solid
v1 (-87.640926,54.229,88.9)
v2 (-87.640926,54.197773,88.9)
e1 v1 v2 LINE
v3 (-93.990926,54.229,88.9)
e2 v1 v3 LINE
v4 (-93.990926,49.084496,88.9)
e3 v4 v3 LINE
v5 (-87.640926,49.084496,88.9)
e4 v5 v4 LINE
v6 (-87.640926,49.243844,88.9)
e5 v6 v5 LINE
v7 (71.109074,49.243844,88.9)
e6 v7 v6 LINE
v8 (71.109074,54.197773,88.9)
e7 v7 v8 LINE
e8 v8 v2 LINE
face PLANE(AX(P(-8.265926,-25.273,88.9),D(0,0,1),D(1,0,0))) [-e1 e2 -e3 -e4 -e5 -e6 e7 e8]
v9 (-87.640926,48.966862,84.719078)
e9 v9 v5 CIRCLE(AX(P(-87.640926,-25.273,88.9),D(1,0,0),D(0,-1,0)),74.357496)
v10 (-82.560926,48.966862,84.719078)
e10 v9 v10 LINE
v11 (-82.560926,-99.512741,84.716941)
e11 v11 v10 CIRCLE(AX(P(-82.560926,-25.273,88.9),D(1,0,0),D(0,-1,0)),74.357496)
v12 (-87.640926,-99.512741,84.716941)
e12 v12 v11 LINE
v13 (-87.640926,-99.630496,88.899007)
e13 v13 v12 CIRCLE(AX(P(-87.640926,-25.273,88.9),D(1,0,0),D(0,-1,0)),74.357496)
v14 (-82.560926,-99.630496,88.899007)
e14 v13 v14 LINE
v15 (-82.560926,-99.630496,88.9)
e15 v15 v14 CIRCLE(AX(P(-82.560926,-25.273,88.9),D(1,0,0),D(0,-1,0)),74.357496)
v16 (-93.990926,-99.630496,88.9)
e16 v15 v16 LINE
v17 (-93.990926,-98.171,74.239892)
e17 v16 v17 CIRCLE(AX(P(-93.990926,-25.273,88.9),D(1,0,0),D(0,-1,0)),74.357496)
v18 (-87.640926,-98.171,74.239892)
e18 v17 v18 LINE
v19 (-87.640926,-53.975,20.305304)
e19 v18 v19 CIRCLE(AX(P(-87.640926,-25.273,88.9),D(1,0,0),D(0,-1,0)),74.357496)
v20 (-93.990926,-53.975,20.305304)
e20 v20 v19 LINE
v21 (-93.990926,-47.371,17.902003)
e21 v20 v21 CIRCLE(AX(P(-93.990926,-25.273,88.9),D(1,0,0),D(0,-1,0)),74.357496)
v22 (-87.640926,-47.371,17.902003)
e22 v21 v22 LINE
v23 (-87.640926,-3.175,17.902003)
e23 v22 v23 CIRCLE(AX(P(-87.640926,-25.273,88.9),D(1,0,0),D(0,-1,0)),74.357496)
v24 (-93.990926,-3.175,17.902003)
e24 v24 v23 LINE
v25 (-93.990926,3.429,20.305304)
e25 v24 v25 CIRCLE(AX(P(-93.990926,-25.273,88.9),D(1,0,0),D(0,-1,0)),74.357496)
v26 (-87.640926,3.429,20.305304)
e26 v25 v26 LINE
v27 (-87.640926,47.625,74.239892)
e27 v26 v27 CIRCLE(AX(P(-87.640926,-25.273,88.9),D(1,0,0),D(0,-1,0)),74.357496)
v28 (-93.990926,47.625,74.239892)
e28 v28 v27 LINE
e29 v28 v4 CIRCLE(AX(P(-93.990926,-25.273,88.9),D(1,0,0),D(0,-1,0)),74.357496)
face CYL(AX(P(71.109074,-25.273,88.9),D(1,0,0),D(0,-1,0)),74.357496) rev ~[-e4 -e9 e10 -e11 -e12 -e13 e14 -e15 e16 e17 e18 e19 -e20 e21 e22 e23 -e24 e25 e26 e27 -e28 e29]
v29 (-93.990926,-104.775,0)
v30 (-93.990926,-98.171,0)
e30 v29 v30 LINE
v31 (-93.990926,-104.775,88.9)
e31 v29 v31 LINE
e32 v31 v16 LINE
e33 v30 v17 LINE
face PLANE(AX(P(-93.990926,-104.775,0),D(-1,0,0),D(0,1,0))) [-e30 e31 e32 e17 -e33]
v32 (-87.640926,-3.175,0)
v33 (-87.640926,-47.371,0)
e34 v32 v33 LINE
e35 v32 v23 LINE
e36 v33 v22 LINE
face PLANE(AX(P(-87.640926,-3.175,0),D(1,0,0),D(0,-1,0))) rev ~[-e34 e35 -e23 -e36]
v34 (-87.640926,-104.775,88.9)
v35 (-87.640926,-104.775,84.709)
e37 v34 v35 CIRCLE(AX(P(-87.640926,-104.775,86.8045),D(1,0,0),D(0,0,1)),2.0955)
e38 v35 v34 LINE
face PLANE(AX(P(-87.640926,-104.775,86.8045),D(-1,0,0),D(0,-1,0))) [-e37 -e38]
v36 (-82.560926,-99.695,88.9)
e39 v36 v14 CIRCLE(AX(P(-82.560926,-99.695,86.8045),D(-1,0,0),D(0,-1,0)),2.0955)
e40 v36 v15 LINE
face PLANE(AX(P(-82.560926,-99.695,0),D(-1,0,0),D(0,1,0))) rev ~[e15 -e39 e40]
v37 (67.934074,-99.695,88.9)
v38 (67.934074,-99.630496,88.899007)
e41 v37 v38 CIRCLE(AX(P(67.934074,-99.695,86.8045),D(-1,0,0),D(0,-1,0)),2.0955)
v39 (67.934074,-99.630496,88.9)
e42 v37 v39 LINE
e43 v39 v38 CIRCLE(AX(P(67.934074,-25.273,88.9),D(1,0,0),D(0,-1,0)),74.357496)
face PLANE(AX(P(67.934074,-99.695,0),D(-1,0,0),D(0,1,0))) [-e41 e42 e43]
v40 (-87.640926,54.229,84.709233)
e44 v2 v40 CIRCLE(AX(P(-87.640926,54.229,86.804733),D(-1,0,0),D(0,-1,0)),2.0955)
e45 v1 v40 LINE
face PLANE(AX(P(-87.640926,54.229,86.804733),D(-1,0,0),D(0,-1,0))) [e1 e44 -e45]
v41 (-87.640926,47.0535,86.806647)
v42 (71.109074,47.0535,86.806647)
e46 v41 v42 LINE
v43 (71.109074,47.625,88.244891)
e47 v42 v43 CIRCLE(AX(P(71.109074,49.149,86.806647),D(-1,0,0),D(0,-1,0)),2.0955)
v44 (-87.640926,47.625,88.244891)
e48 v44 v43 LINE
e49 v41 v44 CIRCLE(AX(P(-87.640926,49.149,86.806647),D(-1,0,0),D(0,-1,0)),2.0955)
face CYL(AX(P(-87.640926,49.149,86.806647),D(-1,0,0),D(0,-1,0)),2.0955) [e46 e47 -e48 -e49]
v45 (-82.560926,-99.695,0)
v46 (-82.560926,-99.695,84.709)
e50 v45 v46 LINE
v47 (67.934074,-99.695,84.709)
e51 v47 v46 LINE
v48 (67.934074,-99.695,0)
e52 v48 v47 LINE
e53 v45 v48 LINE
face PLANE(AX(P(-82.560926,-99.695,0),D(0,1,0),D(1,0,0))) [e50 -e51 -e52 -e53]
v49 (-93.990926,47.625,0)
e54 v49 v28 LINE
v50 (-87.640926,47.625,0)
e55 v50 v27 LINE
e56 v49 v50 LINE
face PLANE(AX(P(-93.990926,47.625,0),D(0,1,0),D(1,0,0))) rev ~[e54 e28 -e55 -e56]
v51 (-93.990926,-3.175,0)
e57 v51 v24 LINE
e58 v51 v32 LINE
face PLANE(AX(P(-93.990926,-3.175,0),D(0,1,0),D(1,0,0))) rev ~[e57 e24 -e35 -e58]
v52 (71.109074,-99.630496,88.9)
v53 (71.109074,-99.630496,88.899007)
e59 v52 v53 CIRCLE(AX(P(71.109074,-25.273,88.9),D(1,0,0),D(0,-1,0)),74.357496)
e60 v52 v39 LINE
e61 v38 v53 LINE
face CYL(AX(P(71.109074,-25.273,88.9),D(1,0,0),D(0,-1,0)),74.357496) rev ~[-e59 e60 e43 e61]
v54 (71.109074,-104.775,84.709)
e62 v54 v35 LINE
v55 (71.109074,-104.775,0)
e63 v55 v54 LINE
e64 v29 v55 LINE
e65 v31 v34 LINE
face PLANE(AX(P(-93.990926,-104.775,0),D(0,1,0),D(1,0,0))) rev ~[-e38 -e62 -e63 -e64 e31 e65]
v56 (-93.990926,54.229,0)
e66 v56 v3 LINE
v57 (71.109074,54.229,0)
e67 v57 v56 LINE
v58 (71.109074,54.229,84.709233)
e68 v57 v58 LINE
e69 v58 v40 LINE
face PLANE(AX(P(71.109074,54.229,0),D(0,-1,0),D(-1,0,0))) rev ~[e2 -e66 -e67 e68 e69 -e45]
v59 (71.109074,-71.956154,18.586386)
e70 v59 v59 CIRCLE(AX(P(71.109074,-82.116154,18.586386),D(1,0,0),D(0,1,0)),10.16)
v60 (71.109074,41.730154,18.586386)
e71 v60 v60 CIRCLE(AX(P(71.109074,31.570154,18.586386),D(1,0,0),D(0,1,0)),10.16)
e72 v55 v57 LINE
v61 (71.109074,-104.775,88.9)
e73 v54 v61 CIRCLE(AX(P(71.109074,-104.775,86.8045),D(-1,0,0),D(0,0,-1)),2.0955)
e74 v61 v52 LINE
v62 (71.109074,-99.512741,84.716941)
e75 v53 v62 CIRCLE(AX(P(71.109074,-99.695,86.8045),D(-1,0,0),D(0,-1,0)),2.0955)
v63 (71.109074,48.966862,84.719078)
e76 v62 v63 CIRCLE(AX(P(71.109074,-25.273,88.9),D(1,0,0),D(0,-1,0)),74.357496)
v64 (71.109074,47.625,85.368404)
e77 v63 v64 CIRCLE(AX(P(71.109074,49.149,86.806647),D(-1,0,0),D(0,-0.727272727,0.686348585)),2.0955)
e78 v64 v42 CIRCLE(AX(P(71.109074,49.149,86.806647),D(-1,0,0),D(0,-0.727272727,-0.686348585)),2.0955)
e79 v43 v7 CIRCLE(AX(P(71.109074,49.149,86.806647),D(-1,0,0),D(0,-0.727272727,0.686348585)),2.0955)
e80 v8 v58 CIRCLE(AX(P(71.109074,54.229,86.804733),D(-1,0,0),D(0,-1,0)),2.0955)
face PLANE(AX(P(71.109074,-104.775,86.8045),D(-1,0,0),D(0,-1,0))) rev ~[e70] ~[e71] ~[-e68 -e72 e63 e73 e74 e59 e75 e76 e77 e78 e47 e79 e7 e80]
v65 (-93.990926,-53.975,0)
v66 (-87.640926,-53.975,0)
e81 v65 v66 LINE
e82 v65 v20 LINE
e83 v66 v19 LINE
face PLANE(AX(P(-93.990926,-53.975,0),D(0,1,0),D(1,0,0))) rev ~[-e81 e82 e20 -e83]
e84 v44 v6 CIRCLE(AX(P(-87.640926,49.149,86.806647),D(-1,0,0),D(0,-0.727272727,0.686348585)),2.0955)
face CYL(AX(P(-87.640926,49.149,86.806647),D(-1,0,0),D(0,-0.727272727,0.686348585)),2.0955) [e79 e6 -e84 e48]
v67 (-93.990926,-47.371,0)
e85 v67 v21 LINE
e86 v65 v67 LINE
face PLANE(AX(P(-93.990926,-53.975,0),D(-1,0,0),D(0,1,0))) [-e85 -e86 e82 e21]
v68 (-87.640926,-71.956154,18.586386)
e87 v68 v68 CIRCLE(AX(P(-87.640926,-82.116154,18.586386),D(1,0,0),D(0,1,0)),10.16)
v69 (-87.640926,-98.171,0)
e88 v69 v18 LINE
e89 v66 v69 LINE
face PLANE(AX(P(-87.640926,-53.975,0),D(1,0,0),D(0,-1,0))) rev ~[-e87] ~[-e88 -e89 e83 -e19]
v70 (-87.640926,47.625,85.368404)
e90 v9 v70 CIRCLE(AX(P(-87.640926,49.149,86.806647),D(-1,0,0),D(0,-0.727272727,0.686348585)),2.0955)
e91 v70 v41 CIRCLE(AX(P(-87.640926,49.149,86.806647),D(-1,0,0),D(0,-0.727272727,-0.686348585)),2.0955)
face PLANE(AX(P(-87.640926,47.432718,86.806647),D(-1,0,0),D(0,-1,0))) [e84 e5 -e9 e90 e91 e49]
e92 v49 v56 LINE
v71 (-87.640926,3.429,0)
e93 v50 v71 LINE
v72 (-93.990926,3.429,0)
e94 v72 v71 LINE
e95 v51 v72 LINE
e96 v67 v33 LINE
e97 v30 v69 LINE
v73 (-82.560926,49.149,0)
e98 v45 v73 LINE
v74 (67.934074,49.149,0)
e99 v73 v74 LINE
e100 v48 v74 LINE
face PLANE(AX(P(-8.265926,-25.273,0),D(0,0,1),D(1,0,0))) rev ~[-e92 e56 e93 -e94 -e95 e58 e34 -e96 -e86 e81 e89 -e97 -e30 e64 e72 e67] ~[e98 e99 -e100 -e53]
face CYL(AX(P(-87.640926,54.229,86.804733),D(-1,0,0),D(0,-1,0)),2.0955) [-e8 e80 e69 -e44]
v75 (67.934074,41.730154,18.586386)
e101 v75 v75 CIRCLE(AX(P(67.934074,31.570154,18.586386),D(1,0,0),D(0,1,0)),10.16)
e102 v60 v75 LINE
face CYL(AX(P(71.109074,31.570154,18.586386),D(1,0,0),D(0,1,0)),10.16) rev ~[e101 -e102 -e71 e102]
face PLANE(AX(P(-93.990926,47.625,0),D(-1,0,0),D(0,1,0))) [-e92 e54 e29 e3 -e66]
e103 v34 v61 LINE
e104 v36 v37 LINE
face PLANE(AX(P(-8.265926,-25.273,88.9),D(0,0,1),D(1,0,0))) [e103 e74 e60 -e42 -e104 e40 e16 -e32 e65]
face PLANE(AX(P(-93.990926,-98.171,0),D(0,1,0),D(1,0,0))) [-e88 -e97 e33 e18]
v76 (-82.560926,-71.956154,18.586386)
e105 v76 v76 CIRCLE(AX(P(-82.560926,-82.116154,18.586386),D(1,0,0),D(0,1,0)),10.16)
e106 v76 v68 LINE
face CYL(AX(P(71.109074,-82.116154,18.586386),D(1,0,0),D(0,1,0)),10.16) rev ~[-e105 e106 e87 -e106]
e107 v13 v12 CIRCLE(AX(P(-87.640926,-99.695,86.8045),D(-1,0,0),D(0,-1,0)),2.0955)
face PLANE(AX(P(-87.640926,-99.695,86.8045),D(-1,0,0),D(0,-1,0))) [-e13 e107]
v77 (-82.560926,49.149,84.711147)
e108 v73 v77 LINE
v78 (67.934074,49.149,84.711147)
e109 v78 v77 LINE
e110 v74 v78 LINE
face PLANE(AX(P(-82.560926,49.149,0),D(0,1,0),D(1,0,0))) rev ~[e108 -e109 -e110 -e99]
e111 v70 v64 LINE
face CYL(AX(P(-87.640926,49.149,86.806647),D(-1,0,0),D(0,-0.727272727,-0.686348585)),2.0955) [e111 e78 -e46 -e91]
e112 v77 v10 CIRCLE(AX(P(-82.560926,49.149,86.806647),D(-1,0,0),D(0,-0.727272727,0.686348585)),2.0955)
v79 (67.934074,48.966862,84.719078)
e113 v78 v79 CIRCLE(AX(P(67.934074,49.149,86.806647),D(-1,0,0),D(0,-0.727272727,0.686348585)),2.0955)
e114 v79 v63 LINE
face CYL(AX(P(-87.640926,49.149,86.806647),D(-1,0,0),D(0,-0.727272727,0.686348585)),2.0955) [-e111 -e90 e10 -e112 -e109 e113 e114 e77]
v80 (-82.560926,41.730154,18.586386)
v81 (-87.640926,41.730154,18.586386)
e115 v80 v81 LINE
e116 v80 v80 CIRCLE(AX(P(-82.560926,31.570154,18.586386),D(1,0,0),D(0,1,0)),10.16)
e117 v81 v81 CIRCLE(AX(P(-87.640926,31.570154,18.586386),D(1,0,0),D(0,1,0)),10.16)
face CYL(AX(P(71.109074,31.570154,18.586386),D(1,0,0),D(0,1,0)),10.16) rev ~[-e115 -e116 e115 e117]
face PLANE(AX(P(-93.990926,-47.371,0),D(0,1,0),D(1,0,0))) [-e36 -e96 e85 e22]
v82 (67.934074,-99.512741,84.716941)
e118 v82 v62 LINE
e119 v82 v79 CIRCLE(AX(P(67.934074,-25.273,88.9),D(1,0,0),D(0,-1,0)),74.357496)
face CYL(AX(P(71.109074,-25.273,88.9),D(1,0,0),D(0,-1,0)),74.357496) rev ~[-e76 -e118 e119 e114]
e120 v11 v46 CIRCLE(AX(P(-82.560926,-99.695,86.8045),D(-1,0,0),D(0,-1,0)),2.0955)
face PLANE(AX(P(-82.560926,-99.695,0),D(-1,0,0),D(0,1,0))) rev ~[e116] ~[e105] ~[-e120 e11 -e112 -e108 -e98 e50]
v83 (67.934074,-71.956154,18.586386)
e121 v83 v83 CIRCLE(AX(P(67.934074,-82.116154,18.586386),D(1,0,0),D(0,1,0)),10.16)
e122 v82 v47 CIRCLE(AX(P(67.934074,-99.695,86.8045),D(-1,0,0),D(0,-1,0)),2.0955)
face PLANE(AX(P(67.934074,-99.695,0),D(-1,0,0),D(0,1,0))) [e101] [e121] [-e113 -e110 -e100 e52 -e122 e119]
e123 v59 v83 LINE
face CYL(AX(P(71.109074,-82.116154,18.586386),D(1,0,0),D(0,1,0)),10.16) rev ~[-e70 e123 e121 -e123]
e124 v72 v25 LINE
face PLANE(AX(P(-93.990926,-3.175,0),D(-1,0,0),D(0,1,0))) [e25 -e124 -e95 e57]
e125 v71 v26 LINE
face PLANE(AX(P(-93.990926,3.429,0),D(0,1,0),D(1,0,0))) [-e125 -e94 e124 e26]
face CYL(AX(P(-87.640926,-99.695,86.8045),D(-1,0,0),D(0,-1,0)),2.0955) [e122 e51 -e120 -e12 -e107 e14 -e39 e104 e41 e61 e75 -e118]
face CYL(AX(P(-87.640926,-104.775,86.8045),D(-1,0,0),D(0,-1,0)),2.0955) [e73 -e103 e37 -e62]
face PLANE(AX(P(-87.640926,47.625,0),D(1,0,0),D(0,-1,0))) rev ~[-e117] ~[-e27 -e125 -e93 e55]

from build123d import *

# Parameters (mm, degrees)
F0_W     = 150.495
F0_H     = 148.844
F0_W_2   = 6.35
F0_H_2   = 6.604
F1_DEPTH = 88.9
F3_R     = 10.16
F4_DEPTH = 187.706
F2_R     = 2.0955
F5_DEPTH = 158.75


with BuildPart() as f1:
    # F0 (on Top) → F1 (new body)
    with BuildSketch(Plane.XY):
        Polygon((71.1090738666, 54.229), (-87.6409261334, 54.229), (-87.6409261334, 47.625), (-87.6409261334, 3.429), (-87.6409261334, -3.175), (-87.6409261334, -47.371), (-87.6409261334, -53.975), (-87.6409261334, -98.171), (-87.6409261334, -104.775), (71.1090738666, -104.775), align=None)
        with Locations((-7.3134261334, -25.273)):
            Rectangle(F0_W, F0_H, mode=Mode.SUBTRACT)
        with Locations((-90.8159261334, 50.927)):
            Rectangle(F0_W_2, F0_H_2)
        with Locations((-90.8159261334, 0.127)):
            Rectangle(F0_W_2, F0_H_2)
        with Locations((-90.8159261334, -50.673)):
            Rectangle(F0_W_2, F0_H_2)
        with Locations((-90.8159261334, -101.473)):
            Rectangle(F0_W_2, F0_H_2)
    extrude(amount=F1_DEPTH)

    # F3 (on face) → F4 (cut)
    with BuildSketch(Plane.YZ.offset(71.1090738666)):
        with BuildLine():
            ThreePointArc((-99.6304956393, 88.9), (-25.273, 14.5425043607), (49.0844956393, 88.9))
            Line((49.0844956393, 88.9), (-99.6304956393, 88.9))
        make_face()
        with Locations((-82.1161537051, 18.5863859951)):
            Circle(F3_R)
        with Locations((31.5701537051, 18.5863859951)):
            Circle(F3_R)
    extrude(amount=-F4_DEPTH, mode=Mode.SUBTRACT)

    # F2 (on face) → F5 (join, through all)
    with BuildSketch(Plane(origin=(-87.6409261334, 0, 0), x_dir=(0, -1, 0), z_dir=(-1, 0, 0))):
        with Locations((104.775, 86.8045)):
            Circle(F2_R)
        with Locations((-54.229, 86.8047326803)):
            Circle(F2_R)
        with BuildLine():
            ThreePointArc((-47.625, 85.3684040196), (-47.2016091494, 86.0328328215), (-47.0535, 86.8066474795))
            ThreePointArc((-47.0535, 86.8066474795), (-47.2016091494, 87.5804621376), (-47.625, 88.2448909395))
            Line((-47.625, 88.2448909395), (-47.625, 85.3684040196))
        make_face()
        with BuildLine():
            Line((-47.625, 85.3684040196), (-47.625, 88.2448909395))
            ThreePointArc((-47.625, 88.2448909395), (-51.2445, 86.8066474795), (-47.625, 85.3684040196))
        make_face()
        with Locations((99.695, 86.8045)):
            Circle(F2_R)
    extrude(amount=-F5_DEPTH)


solid = f1.part
